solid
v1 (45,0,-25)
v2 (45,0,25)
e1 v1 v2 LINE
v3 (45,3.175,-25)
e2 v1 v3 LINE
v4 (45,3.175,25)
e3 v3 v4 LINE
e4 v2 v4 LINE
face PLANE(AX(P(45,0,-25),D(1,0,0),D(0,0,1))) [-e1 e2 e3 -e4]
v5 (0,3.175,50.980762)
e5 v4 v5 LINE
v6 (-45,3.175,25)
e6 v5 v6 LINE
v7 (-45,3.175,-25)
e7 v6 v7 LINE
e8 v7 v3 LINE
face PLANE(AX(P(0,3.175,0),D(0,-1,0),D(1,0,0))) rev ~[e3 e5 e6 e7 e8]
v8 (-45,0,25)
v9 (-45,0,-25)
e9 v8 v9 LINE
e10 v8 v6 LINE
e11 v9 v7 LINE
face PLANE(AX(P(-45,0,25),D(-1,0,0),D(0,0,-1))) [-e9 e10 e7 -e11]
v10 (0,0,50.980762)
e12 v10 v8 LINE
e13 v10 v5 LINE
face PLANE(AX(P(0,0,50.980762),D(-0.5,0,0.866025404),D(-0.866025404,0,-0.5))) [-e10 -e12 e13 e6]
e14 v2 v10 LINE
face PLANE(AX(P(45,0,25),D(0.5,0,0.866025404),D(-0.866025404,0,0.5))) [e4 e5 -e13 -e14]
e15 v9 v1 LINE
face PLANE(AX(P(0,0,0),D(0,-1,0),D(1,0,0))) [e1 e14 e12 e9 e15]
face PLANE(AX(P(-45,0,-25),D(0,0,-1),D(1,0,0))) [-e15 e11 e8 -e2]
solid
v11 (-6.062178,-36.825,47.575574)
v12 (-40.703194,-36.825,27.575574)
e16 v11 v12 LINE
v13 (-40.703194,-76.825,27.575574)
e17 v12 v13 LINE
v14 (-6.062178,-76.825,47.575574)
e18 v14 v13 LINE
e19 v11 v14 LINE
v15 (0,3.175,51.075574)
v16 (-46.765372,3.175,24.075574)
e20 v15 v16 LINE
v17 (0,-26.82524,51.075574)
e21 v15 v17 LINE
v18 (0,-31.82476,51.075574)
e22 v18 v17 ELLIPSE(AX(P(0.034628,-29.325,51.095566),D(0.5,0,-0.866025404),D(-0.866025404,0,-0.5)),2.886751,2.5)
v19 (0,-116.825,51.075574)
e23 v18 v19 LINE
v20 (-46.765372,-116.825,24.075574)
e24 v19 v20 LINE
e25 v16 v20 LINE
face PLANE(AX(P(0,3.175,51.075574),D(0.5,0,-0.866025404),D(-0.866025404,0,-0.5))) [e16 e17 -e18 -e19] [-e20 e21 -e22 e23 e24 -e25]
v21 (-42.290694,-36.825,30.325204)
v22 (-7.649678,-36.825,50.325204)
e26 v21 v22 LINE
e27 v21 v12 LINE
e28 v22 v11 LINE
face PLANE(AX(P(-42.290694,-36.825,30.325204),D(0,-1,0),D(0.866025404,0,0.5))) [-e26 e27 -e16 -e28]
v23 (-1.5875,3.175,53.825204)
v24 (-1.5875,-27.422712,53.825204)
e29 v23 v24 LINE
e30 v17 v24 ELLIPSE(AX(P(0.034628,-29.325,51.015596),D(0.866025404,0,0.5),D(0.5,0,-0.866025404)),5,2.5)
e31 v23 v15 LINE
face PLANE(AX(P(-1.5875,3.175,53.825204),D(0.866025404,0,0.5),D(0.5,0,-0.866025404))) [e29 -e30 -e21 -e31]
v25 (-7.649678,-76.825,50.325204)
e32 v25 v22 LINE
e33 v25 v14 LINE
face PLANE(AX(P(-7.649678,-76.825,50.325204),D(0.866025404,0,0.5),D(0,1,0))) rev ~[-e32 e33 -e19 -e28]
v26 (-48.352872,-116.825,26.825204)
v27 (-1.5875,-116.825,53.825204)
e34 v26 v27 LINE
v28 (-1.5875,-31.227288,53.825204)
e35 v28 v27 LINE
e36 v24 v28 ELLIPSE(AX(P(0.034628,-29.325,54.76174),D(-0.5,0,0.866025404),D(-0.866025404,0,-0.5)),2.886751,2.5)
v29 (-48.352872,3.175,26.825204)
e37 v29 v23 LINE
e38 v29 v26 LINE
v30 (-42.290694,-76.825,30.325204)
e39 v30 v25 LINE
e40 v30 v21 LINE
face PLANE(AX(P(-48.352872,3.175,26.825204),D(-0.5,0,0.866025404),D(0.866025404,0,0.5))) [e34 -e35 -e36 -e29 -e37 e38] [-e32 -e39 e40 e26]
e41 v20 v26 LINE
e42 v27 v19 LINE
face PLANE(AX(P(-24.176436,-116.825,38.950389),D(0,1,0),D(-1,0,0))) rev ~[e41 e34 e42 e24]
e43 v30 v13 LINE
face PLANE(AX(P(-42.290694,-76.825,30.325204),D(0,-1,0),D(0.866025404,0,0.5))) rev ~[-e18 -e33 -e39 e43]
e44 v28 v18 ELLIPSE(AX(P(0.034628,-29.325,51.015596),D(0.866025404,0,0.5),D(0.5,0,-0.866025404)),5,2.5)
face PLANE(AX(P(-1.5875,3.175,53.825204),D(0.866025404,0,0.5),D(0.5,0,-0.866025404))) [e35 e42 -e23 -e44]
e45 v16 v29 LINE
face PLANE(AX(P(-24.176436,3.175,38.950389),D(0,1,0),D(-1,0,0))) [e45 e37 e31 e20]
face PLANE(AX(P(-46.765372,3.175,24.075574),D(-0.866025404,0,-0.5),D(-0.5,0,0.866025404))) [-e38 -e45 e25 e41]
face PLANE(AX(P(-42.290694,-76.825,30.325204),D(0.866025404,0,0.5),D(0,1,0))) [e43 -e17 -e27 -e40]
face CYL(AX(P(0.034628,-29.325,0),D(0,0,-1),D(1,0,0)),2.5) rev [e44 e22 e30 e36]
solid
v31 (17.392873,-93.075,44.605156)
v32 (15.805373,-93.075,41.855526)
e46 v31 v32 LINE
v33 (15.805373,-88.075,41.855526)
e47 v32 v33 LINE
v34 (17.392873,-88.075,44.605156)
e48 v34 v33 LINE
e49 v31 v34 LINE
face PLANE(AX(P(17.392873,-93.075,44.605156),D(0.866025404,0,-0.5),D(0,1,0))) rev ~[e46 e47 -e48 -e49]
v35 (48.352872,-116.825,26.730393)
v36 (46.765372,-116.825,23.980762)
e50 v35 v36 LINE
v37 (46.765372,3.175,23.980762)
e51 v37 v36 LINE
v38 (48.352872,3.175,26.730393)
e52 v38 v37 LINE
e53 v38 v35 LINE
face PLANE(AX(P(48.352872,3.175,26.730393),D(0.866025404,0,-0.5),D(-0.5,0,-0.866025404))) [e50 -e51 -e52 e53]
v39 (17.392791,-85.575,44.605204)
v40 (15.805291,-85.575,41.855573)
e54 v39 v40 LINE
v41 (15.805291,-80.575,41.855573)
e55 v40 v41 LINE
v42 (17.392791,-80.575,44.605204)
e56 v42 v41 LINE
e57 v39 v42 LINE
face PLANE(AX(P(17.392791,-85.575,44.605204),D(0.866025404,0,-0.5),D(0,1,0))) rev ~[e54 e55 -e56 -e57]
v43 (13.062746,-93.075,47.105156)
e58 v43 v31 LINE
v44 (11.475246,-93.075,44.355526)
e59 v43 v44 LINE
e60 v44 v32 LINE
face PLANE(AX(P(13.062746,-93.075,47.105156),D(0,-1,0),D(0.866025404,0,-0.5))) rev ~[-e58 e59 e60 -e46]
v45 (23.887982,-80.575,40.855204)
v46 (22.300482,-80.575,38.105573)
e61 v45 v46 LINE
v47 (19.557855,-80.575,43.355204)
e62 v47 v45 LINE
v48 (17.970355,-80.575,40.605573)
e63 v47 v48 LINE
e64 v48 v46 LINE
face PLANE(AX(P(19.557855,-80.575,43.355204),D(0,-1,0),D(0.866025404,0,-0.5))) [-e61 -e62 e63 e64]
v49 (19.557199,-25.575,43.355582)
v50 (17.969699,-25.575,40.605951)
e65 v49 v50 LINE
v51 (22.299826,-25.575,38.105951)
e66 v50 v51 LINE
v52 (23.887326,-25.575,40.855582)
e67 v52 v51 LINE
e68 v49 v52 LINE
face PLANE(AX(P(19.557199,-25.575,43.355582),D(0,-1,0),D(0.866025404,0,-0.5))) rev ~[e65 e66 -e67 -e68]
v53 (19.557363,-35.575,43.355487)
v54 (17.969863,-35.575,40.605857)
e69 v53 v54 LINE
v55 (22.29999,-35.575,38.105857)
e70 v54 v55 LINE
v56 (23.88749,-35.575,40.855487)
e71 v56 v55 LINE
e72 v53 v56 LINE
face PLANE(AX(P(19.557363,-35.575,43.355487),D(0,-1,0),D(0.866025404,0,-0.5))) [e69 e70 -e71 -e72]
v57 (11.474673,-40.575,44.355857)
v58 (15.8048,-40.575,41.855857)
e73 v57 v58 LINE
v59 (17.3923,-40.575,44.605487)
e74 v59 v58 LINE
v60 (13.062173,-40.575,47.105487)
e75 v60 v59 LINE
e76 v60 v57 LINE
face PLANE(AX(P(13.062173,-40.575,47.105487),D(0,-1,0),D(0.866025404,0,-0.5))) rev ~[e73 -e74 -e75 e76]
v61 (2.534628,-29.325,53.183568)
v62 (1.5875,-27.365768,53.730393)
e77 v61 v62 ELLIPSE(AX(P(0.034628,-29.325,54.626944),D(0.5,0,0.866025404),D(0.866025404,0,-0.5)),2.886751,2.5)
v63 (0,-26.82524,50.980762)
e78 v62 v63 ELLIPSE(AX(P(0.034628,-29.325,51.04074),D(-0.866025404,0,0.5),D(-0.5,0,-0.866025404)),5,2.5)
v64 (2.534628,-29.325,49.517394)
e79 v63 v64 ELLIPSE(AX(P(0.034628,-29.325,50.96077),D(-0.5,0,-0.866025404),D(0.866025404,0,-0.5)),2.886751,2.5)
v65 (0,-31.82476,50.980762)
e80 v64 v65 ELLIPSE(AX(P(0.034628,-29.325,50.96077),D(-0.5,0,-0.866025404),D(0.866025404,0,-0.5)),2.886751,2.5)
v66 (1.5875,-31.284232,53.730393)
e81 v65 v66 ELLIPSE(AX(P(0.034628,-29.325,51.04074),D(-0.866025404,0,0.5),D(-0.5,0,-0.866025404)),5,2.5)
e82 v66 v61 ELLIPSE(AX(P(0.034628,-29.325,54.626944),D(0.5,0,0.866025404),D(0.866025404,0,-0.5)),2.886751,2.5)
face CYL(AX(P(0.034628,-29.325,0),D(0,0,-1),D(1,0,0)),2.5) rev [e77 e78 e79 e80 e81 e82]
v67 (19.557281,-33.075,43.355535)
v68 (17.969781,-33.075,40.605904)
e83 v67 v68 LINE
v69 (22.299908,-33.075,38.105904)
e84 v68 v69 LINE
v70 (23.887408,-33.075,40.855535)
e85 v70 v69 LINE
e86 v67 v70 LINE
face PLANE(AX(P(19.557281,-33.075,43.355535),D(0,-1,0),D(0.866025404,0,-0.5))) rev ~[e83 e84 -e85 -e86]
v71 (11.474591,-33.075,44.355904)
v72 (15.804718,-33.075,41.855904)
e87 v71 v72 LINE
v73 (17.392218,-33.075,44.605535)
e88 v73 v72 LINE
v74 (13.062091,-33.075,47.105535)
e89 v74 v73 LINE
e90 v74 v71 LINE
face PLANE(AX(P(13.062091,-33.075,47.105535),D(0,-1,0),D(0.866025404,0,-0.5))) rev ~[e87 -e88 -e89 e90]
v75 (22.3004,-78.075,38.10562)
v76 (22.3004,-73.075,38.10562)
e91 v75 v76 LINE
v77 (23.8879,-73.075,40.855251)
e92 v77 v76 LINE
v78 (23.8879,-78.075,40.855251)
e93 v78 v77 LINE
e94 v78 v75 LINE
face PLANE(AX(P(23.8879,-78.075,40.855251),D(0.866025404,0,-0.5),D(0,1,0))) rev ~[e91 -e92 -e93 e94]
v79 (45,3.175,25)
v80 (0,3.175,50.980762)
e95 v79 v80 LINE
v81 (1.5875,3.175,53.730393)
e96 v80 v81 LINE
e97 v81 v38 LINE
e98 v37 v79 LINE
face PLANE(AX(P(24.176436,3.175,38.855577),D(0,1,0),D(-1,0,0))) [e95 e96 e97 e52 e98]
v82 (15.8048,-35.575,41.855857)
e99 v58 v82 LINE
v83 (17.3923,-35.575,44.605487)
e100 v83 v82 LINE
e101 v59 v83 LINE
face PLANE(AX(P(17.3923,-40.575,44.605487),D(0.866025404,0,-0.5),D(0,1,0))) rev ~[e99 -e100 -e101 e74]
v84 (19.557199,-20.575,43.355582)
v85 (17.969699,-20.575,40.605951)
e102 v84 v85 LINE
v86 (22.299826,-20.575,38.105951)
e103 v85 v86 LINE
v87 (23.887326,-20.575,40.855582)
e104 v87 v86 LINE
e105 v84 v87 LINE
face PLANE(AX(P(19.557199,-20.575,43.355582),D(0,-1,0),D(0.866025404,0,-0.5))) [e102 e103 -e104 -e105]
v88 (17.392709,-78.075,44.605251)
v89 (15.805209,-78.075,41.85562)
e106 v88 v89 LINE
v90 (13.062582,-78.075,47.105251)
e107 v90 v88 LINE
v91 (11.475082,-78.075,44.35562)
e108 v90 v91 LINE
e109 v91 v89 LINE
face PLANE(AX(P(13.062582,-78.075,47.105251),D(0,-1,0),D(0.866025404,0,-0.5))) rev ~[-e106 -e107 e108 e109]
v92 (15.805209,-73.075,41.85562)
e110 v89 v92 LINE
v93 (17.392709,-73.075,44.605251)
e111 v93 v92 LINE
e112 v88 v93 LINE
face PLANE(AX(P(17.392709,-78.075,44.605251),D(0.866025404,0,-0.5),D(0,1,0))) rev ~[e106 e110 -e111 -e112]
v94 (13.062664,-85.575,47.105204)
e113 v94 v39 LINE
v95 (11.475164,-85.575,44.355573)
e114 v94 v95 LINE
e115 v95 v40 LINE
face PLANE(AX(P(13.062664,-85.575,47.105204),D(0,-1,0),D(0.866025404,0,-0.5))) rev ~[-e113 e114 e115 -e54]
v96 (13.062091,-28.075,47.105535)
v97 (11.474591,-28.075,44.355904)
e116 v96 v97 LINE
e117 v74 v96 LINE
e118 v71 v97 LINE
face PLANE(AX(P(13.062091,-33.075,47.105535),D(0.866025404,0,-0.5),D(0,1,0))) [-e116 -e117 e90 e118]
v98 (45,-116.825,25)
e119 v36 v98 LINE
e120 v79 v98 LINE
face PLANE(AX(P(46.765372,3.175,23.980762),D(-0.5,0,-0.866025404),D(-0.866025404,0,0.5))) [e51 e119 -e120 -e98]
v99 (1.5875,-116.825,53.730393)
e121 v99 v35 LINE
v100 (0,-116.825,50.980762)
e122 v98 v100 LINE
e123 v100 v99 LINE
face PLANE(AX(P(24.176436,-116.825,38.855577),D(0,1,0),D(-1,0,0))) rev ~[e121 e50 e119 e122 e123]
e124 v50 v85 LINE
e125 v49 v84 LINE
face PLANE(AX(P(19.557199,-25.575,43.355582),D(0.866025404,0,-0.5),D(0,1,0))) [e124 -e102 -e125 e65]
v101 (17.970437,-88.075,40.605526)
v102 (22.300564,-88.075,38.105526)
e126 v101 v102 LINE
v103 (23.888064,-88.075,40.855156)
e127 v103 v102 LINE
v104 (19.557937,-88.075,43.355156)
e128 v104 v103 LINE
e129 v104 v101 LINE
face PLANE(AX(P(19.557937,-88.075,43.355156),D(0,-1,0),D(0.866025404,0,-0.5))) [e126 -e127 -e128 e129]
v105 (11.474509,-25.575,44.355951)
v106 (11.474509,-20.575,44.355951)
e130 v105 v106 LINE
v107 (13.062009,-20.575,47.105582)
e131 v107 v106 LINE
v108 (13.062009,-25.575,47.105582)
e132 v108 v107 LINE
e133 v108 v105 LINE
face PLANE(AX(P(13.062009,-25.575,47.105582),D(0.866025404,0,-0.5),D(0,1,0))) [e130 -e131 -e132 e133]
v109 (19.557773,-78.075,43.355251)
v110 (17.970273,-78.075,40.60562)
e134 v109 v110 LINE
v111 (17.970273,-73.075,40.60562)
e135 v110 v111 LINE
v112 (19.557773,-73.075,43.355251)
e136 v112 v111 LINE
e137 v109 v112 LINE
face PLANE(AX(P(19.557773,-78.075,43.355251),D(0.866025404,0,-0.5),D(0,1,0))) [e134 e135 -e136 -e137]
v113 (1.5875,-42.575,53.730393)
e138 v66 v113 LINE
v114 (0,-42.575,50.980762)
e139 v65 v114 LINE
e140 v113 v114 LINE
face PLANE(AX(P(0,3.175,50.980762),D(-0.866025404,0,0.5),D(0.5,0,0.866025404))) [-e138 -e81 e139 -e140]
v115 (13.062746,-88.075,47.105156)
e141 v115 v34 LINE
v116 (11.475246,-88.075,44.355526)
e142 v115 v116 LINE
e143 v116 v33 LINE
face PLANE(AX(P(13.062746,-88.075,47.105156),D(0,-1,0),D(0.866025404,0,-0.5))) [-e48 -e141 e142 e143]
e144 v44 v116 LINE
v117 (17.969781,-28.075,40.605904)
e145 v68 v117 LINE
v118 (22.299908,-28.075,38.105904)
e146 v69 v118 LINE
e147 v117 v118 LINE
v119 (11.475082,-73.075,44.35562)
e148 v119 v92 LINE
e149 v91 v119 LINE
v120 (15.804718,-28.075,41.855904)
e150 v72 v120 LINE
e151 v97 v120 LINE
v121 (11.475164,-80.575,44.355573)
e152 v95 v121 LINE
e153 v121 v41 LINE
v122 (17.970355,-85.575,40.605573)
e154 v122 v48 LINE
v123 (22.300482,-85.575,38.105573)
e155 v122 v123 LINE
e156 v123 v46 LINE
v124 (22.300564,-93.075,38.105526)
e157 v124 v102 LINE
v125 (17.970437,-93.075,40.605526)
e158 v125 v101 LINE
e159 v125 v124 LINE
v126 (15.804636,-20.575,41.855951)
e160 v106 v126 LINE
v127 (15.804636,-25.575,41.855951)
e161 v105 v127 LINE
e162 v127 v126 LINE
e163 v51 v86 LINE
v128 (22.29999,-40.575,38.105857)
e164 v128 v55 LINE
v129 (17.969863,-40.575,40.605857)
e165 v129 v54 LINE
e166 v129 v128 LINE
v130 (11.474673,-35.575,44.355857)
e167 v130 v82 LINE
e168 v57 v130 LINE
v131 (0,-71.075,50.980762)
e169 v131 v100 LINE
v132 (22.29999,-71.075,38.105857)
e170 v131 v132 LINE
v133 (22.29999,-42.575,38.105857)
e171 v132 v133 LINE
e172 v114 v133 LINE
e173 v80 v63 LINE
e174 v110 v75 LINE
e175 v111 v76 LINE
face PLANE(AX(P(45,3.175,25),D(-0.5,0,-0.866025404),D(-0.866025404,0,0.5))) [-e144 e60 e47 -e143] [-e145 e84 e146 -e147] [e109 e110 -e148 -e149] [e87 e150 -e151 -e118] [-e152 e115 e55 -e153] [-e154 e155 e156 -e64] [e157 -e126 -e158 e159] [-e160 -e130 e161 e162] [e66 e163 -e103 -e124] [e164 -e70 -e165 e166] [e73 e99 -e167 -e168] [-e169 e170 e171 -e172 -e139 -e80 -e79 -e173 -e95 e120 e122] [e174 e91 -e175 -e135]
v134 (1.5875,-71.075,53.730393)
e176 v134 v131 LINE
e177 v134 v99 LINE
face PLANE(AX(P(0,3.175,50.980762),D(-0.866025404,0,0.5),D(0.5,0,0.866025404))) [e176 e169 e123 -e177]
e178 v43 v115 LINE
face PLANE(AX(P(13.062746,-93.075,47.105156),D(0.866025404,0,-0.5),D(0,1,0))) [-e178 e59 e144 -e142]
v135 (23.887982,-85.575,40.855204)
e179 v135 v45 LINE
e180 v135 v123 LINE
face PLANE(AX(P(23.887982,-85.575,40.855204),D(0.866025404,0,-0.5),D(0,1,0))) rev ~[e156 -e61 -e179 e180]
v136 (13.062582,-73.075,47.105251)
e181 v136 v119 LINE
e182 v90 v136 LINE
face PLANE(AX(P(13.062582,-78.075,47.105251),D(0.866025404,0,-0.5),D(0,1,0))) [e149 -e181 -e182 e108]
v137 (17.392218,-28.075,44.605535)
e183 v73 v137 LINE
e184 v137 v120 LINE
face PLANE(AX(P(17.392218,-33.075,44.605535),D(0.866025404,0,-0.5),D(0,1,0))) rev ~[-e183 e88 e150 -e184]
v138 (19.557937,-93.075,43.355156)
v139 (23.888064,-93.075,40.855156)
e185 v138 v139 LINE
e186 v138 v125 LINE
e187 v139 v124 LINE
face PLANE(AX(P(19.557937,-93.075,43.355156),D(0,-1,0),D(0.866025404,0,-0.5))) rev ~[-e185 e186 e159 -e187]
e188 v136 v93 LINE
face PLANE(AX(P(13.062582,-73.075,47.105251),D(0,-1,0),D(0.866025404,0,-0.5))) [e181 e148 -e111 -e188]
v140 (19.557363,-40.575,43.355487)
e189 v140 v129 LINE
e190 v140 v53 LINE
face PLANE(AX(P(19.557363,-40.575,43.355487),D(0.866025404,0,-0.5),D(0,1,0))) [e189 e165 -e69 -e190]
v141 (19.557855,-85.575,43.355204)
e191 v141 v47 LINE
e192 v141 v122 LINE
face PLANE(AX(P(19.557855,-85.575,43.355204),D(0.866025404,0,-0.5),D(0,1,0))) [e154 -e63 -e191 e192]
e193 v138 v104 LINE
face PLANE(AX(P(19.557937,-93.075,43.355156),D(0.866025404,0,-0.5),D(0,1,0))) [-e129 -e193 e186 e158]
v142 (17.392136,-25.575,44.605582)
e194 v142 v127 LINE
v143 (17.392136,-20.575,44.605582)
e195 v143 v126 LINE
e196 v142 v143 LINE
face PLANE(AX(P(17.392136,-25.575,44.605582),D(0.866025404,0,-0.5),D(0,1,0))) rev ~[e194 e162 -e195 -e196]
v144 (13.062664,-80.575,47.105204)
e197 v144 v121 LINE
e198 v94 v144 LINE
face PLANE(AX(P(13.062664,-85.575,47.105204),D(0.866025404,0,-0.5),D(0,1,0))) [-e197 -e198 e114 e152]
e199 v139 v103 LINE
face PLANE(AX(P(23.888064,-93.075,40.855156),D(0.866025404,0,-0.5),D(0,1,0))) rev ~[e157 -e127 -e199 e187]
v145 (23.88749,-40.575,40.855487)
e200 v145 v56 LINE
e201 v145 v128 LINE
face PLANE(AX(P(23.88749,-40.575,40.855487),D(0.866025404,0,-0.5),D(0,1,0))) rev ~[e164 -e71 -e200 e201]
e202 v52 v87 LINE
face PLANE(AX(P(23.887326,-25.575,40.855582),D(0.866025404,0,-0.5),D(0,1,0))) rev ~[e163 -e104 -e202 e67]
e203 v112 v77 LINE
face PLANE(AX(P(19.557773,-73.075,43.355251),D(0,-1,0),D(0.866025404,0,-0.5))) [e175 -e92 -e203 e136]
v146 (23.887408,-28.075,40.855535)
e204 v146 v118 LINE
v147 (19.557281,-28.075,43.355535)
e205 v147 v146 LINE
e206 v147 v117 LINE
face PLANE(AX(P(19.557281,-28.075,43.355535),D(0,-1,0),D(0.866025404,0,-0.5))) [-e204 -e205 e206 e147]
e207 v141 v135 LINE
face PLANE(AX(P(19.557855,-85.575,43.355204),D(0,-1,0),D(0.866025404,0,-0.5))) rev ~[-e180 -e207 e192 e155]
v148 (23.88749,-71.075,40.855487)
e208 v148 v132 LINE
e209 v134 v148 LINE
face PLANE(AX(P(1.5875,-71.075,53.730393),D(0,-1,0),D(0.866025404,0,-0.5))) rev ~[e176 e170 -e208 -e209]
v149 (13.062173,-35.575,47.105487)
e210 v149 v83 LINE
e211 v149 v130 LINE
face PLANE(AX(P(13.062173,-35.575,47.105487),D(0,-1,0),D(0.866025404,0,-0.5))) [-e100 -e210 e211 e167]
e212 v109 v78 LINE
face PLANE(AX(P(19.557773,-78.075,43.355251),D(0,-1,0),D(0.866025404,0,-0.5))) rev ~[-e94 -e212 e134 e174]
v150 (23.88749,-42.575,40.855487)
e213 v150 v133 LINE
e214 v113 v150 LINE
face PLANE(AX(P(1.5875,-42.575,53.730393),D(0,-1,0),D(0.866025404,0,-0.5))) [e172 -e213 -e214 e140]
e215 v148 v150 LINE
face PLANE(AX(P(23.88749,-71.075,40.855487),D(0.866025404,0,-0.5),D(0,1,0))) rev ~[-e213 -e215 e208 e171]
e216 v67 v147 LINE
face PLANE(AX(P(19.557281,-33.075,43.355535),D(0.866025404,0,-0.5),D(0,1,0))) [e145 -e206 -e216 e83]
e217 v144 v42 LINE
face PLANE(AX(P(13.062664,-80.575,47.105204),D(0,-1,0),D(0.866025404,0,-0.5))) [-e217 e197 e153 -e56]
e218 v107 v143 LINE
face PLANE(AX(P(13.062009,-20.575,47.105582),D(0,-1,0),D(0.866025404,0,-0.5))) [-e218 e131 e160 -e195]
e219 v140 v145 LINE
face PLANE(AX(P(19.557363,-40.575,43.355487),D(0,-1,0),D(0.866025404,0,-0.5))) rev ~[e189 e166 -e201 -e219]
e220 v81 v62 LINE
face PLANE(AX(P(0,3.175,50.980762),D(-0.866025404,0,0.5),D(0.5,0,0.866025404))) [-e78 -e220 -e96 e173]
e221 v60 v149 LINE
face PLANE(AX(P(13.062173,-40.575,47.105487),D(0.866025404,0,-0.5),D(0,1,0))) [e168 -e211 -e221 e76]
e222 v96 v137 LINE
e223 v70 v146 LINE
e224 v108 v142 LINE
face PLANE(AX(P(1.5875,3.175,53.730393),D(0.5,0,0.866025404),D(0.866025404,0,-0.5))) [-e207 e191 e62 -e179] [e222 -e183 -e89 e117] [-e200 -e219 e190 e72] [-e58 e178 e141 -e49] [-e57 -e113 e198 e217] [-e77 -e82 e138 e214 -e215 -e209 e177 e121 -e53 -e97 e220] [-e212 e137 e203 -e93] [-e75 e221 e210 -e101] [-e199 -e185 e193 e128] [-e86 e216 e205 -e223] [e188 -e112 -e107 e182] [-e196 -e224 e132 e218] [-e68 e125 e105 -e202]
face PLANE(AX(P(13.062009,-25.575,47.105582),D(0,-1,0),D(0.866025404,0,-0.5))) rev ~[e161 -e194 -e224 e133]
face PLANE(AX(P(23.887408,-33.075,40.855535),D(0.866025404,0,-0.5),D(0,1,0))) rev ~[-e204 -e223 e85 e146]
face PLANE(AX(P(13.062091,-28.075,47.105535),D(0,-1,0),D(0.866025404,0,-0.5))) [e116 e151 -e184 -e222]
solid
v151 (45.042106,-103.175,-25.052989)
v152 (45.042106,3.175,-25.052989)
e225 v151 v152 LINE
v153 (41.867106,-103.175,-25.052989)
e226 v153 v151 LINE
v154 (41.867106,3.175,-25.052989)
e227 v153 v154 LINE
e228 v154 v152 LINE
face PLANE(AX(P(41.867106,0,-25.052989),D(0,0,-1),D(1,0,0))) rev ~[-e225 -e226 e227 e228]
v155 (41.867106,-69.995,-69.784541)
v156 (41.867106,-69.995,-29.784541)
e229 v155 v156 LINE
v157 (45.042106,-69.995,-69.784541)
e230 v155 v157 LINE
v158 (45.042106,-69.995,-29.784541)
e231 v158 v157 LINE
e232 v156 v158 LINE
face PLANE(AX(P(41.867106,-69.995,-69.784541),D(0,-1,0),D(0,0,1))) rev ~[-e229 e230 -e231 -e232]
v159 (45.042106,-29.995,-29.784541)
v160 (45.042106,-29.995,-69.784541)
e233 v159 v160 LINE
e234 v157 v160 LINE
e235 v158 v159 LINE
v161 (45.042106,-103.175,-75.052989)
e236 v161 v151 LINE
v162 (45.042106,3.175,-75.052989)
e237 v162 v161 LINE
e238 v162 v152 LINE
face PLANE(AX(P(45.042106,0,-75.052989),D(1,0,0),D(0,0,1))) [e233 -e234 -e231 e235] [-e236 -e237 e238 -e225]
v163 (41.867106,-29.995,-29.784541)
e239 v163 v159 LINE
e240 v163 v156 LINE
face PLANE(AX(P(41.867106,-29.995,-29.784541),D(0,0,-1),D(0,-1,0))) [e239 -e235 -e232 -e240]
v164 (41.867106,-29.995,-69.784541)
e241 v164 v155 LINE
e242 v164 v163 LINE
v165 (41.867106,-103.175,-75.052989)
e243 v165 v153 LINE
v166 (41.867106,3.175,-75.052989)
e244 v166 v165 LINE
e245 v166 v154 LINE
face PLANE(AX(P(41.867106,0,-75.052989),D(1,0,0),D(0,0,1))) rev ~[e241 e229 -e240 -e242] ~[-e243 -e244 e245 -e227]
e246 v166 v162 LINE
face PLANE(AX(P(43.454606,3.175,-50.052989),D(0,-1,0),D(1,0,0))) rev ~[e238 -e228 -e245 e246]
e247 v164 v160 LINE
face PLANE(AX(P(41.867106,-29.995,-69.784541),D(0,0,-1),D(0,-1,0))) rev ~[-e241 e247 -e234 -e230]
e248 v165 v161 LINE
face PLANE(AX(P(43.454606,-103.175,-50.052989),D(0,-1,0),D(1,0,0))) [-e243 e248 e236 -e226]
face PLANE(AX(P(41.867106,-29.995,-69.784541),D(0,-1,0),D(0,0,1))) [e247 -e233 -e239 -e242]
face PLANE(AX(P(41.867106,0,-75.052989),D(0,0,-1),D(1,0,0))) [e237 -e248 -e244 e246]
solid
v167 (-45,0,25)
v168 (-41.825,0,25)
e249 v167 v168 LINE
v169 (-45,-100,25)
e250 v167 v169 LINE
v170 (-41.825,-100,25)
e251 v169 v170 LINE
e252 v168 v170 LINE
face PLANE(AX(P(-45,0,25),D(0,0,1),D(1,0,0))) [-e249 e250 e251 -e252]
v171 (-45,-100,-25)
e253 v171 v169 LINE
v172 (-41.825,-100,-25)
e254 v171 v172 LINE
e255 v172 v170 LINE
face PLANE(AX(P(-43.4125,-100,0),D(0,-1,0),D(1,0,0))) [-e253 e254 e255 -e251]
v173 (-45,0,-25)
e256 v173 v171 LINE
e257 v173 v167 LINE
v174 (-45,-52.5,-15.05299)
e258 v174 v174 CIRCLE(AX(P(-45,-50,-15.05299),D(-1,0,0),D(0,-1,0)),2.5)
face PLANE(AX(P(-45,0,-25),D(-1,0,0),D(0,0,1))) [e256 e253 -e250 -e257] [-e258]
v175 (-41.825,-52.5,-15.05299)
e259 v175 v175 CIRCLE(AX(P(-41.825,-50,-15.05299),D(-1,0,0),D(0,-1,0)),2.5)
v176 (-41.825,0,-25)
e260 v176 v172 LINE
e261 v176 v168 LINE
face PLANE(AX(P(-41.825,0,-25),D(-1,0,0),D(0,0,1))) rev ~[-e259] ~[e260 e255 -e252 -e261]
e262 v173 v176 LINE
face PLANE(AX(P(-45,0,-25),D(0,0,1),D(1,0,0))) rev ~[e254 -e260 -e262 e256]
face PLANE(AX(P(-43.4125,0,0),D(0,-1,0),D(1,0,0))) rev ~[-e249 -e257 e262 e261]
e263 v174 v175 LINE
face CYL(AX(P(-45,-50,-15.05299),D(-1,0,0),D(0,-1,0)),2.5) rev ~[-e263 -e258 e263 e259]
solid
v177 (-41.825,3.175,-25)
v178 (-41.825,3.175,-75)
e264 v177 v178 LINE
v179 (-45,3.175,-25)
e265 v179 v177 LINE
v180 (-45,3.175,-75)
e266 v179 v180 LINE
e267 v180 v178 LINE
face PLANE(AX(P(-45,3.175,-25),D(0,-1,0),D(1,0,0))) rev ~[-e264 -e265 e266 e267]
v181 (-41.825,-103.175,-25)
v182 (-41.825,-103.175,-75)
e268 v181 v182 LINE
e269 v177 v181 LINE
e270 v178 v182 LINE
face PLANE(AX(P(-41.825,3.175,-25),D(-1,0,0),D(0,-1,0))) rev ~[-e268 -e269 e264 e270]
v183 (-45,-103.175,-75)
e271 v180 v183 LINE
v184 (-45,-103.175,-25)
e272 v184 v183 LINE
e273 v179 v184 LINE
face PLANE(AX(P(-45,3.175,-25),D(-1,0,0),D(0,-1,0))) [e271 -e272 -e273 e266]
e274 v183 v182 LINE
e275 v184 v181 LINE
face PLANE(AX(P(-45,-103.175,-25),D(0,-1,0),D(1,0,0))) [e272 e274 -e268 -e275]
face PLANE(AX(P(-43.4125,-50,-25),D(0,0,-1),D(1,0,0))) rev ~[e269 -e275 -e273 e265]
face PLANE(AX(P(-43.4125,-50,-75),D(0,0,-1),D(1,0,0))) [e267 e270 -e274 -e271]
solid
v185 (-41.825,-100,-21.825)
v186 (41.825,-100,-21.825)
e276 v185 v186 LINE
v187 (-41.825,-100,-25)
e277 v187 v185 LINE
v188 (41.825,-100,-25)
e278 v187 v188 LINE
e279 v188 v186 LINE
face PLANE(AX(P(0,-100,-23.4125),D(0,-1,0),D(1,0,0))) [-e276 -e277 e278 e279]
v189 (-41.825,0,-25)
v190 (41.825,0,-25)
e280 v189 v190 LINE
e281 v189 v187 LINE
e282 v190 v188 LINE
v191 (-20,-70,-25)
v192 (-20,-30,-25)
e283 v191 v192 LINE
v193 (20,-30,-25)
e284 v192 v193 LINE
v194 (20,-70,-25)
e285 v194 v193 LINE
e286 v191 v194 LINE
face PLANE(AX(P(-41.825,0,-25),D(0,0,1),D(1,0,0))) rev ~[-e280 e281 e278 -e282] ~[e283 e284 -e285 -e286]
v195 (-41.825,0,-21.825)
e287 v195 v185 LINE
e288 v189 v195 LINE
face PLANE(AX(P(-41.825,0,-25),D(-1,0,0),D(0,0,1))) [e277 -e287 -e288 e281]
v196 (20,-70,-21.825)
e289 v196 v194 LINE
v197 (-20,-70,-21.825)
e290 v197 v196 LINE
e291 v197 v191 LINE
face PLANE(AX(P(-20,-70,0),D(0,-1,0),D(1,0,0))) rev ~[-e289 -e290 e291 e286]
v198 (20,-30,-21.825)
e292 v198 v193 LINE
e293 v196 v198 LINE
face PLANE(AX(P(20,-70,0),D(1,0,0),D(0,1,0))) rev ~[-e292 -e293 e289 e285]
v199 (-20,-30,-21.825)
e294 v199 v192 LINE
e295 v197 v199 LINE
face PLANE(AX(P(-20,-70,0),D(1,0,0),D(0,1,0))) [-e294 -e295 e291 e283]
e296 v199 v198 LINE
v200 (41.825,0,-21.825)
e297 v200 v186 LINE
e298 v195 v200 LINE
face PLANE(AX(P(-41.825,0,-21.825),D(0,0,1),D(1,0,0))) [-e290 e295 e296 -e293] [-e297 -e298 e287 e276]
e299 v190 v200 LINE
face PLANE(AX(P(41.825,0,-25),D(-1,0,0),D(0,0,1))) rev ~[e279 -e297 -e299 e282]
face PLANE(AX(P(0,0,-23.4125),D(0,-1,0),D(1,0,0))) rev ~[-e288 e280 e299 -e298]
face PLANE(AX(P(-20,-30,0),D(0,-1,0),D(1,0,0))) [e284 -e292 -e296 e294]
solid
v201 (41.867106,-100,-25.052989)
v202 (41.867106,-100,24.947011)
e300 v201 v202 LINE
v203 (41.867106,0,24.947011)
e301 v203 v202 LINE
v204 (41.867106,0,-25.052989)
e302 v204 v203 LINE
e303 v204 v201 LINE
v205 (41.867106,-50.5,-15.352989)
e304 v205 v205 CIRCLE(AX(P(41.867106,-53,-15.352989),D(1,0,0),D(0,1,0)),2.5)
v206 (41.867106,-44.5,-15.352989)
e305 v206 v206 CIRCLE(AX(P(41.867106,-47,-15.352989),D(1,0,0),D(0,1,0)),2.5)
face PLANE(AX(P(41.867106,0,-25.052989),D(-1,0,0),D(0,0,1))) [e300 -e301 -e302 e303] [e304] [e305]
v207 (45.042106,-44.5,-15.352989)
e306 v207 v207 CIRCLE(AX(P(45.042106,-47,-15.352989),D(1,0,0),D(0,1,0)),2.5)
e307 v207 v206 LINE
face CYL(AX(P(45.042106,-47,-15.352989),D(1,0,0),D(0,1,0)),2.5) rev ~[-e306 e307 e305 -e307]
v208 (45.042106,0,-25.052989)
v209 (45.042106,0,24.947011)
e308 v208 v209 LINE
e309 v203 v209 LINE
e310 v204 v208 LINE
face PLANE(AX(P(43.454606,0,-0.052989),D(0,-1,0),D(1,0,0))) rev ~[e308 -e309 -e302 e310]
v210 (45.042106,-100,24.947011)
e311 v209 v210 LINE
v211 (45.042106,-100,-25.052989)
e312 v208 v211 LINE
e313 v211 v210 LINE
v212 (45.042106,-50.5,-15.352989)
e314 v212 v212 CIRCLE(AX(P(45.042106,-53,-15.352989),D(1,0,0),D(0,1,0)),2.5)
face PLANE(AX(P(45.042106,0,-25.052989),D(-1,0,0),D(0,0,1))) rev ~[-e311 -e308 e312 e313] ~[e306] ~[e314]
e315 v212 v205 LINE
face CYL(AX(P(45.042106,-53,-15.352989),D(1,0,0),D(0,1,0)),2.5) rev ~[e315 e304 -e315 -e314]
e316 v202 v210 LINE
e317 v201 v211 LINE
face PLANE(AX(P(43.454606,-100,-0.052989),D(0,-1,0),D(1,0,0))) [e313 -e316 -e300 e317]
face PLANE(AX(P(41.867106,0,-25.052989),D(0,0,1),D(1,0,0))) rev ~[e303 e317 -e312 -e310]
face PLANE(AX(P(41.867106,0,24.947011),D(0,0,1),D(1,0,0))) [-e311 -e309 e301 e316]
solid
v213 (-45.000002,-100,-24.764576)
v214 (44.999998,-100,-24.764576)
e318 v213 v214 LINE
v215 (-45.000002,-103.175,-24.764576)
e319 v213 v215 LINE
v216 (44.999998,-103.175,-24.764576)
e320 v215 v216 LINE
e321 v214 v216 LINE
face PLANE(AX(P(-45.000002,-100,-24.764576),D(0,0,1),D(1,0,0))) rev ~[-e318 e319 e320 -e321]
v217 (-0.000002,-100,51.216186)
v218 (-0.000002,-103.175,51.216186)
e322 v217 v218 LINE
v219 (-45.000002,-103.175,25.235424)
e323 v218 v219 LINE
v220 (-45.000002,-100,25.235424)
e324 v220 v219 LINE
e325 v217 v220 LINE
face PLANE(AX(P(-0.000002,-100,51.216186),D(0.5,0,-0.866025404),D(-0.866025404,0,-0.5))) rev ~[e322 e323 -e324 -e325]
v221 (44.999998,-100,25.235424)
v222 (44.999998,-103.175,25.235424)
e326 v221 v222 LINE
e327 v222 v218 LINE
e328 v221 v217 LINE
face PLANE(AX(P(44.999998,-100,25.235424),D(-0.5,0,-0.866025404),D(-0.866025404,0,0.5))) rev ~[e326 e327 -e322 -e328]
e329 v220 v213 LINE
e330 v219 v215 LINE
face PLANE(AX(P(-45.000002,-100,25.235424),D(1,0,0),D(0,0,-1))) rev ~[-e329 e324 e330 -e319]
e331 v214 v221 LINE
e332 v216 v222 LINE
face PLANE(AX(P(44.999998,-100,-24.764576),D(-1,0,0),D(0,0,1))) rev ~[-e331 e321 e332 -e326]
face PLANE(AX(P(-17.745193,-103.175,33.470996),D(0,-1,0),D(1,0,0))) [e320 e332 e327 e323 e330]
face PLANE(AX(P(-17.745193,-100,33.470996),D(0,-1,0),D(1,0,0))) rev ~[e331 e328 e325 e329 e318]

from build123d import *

# Parameters (mm, degrees)
F1_DEPTH       = 3.175
F2_W           = 3.175
F2_H           = 50
F3_DEPTH       = 100
F4_W           = 3.175
F4_H           = 50
F5_DEPTH       = 100
F7_DEPTH       = 3.175
F8_W           = 83.65
F8_H           = 3.175
F9_DEPTH       = 100
F10_W          = 3.175
F10_H          = 50
F11_DEPTH      = 103.175
F11_DEPTH_BACK = 3.175
F12_W          = 40
F12_H          = 40
F13_DEPTH      = 25
F15_DEPTH      = 120
F18_DEPTH      = 120
F19_W          = 40
F19_H          = 40
F20_DEPTH      = 25
F21_R          = 2.5
F22_DEPTH      = 3.175
F23_W          = 5
F23_H          = 5
F23_W_2        = 25.7498108172
F23_H_2        = 28.499999997
F24_DEPTH      = 3.175
F25_R          = 2.5
F26_DEPTH      = 53.8262042049
F27_W          = 40
F27_H          = 40
F28_DEPTH      = 25
F29_W          = 3.175
F29_H          = 106.35
F30_DEPTH      = 50
F31_R          = 2.5
F32_DEPTH      = 25


# Not quite as in the source:
# - a length typed as a fraction of an inch, garbled in the dataset ("3 / 203.2 mm" for 3/8 in), is restored


with BuildPart() as f1:
    # F0 (on Front) → F1 (new body)
    with BuildSketch(Plane.XZ):
        Polygon((-45, 25), (-45, -25), (45, -25), (45, 25), (0, 25), align=None)
        Polygon((0, 50.9807621135), (-45, 25), (0, 25), align=None)
        Polygon((0, 25), (45, 25), (0, 50.9807621135), align=None)
    extrude(amount=-F1_DEPTH)


with BuildPart() as f3:
    # F2 (on Front) → F3 (new body)
    with BuildSketch(Plane.XZ):
        with Locations((43.454606086, -0.0529892971)):
            Rectangle(F2_W, F2_H)
    extrude(amount=F3_DEPTH)

    # F21 (on face) → F22 (cut, through all)
    with BuildSketch(Plane.YZ.offset(45.042106086)):
        with Locations((-53, -15.3529893)):
            Circle(F21_R)
        with Locations((-47, -15.3529893)):
            Circle(F21_R)
    extrude(amount=-F22_DEPTH, mode=Mode.SUBTRACT)


with BuildPart() as f5:
    # F4 (on Front) → F5 (new body)
    with BuildSketch(Plane.XZ):
        with Locations((-43.4125, 0)):
            Rectangle(F4_W, F4_H)
    extrude(amount=F5_DEPTH)

    # F31 (on face) → F32 (cut)
    with BuildSketch(Plane(origin=(-45, 0, 0), x_dir=(0, -1, 0), z_dir=(-1, 0, 0))):
        with Locations((50, -15.05299)):
            Circle(F31_R)
    extrude(amount=-F32_DEPTH, mode=Mode.SUBTRACT)


with BuildPart() as f7:
    # F6 (on face) → F7 (new body)
    with BuildSketch(Plane.XZ.offset(100)):
        Polygon((-1.9791e-06, 51.2161863094), (-45.0000019791, 25.2354241958), (-1.9791e-06, 25.2354241958), align=None)
        Polygon((-1.9791e-06, 25.2354241958), (-45.0000019791, 25.2354241958), (-45.0000019791, -24.7645758042), (44.9999980209, -24.7645758042), (44.9999980209, 25.2354241958), align=None)
        Polygon((-1.9791e-06, 51.2161863094), (-1.9791e-06, 25.2354241958), (44.9999980209, 25.2354241958), align=None)
    extrude(amount=F7_DEPTH)


with BuildPart() as f9:
    # F8 (on Front) → F9 (new body)
    with BuildSketch(Plane.XZ):
        with Locations((0, -23.4125)):
            Rectangle(F8_W, F8_H)
    extrude(amount=F9_DEPTH)

    # F12 (on Top) → F13 (cut, through all)
    with BuildSketch(Plane.XY):
        with Locations((0, -50)):
            Rectangle(F12_W, F12_H)
    extrude(amount=-F13_DEPTH, mode=Mode.SUBTRACT)


with BuildPart() as f11:
    # F10 (on Front) → F11 (new body, two sides)
    with BuildSketch(Plane.XZ) as f11_sk:
        with Locations((43.454606086, -50.0529892971)):
            Rectangle(F10_W, F10_H)
    extrude(amount=F11_DEPTH)
    extrude(f11_sk.sketch, amount=-F11_DEPTH_BACK)

    # F27 (on face) → F28 (cut)
    with BuildSketch(Plane(origin=(41.867106086, 0, 0), x_dir=(0, -1, 0), z_dir=(-1, 0, 0))):
        with Locations((49.995, -49.7845411301)):
            Rectangle(F27_W, F27_H)
    extrude(amount=-F28_DEPTH, mode=Mode.SUBTRACT)


with BuildPart() as f15:
    # F14 (on face) → F15 (new body)
    with BuildSketch(Plane(origin=(0, 3.175, 0), x_dir=(-1, 0, 0), z_dir=(0, 1, 0))):
        Polygon((1.5875, 53.8252042049), (0, 51.0755735479), (46.7653718044, 24.0755735479), (48.3528718044, 26.8252042049), align=None)
    extrude(amount=-F15_DEPTH)

    # F19 (on face) → F20 (cut)
    with BuildSketch(Plane(origin=(-23.7038721027, 0, 41.0563108179), x_dir=(0.8660254038, 0, 0.5), z_dir=(-0.5, 0, 0.8660254038))):
        with Locations((-1.4622132261, -56.825)):
            Rectangle(F19_W, F19_H)
    extrude(amount=-F20_DEPTH, mode=Mode.SUBTRACT)


with BuildPart() as f18:
    # F17 (on face) → F18 (new body)
    with BuildSketch(Plane(origin=(0, 3.175, 0), x_dir=(-1, 0, 0), z_dir=(0, 1, 0))):
        Polygon((-48.3528718044, 26.7303927705), (-46.7653718044, 23.9807621135), (-45, 25), (0, 50.9807621135), (-1.5875, 53.7303927705), align=None)
    extrude(amount=-F18_DEPTH)

    # F23 (on face) → F24 (cut, through all)
    with BuildSketch(Plane(origin=(23.6628175473, 0, 40.9852022422), x_dir=(0.8660254038, 0, -0.5), z_dir=(0.5, 0, 0.8660254038))):
        with Locations((-9.7399080962, -90.575)):
            Rectangle(F23_W, F23_H)
        with Locations((-9.7400026881, -83.0750000006)):
            Rectangle(F23_W, F23_H)
        with Locations((-9.74009728, -75.5750000012)):
            Rectangle(F23_W, F23_H)
        with Locations((-9.7405702396, -38.0750000042)):
            Rectangle(F23_W, F23_H)
        with Locations((-9.7406648315, -30.5750000048)):
            Rectangle(F23_W, F23_H)
        with Locations((-9.7407594235, -23.0750000054)):
            Rectangle(F23_W, F23_H)
        with Locations((-2.2399080962, -90.575)):
            Rectangle(F23_W, F23_H)
        with Locations((-2.2400026881, -83.0750000006)):
            Rectangle(F23_W, F23_H)
        with Locations((-2.24009728, -75.5750000012)):
            Rectangle(F23_W, F23_H)
        with Locations((-2.2405702396, -38.0750000042)):
            Rectangle(F23_W, F23_H)
        with Locations((-2.2406648315, -30.5750000048)):
            Rectangle(F23_W, F23_H)
        with Locations((-2.2407594235, -23.0750000054)):
            Rectangle(F23_W, F23_H)
        with Locations((-12.6154756482, -56.8250000027)):
            Rectangle(F23_W_2, F23_H_2)
    extrude(amount=-F24_DEPTH, mode=Mode.SUBTRACT)


with BuildPart() as f26_tool:
    # F25 (on Top) → F26 (new body, through all)
    with BuildSketch(Plane.XY):
        with Locations((0.0346281956, -29.325)):
            Circle(F25_R)
    extrude(amount=F26_DEPTH)


with BuildPart() as f15_1:
    add(f15.part)

    # F26: cut by f26_tool
    add(f26_tool.part, mode=Mode.SUBTRACT)


with BuildPart() as f18_1:
    add(f18.part)

    # F26: cut by f26_tool
    add(f26_tool.part, mode=Mode.SUBTRACT)


with BuildPart() as f30:
    # F29 (on face) → F30 (new body)
    with BuildSketch(Plane(origin=(0, 0, -25), x_dir=(1, 0, 0), z_dir=(0, 0, -1))):
        with Locations((-43.4125, 50)):
            Rectangle(F29_W, F29_H)
    extrude(amount=F30_DEPTH)


solid = Compound([f1.part, f3.part, f5.part, f7.part, f9.part, f11.part, f15_1.part, f18_1.part, f30.part])
